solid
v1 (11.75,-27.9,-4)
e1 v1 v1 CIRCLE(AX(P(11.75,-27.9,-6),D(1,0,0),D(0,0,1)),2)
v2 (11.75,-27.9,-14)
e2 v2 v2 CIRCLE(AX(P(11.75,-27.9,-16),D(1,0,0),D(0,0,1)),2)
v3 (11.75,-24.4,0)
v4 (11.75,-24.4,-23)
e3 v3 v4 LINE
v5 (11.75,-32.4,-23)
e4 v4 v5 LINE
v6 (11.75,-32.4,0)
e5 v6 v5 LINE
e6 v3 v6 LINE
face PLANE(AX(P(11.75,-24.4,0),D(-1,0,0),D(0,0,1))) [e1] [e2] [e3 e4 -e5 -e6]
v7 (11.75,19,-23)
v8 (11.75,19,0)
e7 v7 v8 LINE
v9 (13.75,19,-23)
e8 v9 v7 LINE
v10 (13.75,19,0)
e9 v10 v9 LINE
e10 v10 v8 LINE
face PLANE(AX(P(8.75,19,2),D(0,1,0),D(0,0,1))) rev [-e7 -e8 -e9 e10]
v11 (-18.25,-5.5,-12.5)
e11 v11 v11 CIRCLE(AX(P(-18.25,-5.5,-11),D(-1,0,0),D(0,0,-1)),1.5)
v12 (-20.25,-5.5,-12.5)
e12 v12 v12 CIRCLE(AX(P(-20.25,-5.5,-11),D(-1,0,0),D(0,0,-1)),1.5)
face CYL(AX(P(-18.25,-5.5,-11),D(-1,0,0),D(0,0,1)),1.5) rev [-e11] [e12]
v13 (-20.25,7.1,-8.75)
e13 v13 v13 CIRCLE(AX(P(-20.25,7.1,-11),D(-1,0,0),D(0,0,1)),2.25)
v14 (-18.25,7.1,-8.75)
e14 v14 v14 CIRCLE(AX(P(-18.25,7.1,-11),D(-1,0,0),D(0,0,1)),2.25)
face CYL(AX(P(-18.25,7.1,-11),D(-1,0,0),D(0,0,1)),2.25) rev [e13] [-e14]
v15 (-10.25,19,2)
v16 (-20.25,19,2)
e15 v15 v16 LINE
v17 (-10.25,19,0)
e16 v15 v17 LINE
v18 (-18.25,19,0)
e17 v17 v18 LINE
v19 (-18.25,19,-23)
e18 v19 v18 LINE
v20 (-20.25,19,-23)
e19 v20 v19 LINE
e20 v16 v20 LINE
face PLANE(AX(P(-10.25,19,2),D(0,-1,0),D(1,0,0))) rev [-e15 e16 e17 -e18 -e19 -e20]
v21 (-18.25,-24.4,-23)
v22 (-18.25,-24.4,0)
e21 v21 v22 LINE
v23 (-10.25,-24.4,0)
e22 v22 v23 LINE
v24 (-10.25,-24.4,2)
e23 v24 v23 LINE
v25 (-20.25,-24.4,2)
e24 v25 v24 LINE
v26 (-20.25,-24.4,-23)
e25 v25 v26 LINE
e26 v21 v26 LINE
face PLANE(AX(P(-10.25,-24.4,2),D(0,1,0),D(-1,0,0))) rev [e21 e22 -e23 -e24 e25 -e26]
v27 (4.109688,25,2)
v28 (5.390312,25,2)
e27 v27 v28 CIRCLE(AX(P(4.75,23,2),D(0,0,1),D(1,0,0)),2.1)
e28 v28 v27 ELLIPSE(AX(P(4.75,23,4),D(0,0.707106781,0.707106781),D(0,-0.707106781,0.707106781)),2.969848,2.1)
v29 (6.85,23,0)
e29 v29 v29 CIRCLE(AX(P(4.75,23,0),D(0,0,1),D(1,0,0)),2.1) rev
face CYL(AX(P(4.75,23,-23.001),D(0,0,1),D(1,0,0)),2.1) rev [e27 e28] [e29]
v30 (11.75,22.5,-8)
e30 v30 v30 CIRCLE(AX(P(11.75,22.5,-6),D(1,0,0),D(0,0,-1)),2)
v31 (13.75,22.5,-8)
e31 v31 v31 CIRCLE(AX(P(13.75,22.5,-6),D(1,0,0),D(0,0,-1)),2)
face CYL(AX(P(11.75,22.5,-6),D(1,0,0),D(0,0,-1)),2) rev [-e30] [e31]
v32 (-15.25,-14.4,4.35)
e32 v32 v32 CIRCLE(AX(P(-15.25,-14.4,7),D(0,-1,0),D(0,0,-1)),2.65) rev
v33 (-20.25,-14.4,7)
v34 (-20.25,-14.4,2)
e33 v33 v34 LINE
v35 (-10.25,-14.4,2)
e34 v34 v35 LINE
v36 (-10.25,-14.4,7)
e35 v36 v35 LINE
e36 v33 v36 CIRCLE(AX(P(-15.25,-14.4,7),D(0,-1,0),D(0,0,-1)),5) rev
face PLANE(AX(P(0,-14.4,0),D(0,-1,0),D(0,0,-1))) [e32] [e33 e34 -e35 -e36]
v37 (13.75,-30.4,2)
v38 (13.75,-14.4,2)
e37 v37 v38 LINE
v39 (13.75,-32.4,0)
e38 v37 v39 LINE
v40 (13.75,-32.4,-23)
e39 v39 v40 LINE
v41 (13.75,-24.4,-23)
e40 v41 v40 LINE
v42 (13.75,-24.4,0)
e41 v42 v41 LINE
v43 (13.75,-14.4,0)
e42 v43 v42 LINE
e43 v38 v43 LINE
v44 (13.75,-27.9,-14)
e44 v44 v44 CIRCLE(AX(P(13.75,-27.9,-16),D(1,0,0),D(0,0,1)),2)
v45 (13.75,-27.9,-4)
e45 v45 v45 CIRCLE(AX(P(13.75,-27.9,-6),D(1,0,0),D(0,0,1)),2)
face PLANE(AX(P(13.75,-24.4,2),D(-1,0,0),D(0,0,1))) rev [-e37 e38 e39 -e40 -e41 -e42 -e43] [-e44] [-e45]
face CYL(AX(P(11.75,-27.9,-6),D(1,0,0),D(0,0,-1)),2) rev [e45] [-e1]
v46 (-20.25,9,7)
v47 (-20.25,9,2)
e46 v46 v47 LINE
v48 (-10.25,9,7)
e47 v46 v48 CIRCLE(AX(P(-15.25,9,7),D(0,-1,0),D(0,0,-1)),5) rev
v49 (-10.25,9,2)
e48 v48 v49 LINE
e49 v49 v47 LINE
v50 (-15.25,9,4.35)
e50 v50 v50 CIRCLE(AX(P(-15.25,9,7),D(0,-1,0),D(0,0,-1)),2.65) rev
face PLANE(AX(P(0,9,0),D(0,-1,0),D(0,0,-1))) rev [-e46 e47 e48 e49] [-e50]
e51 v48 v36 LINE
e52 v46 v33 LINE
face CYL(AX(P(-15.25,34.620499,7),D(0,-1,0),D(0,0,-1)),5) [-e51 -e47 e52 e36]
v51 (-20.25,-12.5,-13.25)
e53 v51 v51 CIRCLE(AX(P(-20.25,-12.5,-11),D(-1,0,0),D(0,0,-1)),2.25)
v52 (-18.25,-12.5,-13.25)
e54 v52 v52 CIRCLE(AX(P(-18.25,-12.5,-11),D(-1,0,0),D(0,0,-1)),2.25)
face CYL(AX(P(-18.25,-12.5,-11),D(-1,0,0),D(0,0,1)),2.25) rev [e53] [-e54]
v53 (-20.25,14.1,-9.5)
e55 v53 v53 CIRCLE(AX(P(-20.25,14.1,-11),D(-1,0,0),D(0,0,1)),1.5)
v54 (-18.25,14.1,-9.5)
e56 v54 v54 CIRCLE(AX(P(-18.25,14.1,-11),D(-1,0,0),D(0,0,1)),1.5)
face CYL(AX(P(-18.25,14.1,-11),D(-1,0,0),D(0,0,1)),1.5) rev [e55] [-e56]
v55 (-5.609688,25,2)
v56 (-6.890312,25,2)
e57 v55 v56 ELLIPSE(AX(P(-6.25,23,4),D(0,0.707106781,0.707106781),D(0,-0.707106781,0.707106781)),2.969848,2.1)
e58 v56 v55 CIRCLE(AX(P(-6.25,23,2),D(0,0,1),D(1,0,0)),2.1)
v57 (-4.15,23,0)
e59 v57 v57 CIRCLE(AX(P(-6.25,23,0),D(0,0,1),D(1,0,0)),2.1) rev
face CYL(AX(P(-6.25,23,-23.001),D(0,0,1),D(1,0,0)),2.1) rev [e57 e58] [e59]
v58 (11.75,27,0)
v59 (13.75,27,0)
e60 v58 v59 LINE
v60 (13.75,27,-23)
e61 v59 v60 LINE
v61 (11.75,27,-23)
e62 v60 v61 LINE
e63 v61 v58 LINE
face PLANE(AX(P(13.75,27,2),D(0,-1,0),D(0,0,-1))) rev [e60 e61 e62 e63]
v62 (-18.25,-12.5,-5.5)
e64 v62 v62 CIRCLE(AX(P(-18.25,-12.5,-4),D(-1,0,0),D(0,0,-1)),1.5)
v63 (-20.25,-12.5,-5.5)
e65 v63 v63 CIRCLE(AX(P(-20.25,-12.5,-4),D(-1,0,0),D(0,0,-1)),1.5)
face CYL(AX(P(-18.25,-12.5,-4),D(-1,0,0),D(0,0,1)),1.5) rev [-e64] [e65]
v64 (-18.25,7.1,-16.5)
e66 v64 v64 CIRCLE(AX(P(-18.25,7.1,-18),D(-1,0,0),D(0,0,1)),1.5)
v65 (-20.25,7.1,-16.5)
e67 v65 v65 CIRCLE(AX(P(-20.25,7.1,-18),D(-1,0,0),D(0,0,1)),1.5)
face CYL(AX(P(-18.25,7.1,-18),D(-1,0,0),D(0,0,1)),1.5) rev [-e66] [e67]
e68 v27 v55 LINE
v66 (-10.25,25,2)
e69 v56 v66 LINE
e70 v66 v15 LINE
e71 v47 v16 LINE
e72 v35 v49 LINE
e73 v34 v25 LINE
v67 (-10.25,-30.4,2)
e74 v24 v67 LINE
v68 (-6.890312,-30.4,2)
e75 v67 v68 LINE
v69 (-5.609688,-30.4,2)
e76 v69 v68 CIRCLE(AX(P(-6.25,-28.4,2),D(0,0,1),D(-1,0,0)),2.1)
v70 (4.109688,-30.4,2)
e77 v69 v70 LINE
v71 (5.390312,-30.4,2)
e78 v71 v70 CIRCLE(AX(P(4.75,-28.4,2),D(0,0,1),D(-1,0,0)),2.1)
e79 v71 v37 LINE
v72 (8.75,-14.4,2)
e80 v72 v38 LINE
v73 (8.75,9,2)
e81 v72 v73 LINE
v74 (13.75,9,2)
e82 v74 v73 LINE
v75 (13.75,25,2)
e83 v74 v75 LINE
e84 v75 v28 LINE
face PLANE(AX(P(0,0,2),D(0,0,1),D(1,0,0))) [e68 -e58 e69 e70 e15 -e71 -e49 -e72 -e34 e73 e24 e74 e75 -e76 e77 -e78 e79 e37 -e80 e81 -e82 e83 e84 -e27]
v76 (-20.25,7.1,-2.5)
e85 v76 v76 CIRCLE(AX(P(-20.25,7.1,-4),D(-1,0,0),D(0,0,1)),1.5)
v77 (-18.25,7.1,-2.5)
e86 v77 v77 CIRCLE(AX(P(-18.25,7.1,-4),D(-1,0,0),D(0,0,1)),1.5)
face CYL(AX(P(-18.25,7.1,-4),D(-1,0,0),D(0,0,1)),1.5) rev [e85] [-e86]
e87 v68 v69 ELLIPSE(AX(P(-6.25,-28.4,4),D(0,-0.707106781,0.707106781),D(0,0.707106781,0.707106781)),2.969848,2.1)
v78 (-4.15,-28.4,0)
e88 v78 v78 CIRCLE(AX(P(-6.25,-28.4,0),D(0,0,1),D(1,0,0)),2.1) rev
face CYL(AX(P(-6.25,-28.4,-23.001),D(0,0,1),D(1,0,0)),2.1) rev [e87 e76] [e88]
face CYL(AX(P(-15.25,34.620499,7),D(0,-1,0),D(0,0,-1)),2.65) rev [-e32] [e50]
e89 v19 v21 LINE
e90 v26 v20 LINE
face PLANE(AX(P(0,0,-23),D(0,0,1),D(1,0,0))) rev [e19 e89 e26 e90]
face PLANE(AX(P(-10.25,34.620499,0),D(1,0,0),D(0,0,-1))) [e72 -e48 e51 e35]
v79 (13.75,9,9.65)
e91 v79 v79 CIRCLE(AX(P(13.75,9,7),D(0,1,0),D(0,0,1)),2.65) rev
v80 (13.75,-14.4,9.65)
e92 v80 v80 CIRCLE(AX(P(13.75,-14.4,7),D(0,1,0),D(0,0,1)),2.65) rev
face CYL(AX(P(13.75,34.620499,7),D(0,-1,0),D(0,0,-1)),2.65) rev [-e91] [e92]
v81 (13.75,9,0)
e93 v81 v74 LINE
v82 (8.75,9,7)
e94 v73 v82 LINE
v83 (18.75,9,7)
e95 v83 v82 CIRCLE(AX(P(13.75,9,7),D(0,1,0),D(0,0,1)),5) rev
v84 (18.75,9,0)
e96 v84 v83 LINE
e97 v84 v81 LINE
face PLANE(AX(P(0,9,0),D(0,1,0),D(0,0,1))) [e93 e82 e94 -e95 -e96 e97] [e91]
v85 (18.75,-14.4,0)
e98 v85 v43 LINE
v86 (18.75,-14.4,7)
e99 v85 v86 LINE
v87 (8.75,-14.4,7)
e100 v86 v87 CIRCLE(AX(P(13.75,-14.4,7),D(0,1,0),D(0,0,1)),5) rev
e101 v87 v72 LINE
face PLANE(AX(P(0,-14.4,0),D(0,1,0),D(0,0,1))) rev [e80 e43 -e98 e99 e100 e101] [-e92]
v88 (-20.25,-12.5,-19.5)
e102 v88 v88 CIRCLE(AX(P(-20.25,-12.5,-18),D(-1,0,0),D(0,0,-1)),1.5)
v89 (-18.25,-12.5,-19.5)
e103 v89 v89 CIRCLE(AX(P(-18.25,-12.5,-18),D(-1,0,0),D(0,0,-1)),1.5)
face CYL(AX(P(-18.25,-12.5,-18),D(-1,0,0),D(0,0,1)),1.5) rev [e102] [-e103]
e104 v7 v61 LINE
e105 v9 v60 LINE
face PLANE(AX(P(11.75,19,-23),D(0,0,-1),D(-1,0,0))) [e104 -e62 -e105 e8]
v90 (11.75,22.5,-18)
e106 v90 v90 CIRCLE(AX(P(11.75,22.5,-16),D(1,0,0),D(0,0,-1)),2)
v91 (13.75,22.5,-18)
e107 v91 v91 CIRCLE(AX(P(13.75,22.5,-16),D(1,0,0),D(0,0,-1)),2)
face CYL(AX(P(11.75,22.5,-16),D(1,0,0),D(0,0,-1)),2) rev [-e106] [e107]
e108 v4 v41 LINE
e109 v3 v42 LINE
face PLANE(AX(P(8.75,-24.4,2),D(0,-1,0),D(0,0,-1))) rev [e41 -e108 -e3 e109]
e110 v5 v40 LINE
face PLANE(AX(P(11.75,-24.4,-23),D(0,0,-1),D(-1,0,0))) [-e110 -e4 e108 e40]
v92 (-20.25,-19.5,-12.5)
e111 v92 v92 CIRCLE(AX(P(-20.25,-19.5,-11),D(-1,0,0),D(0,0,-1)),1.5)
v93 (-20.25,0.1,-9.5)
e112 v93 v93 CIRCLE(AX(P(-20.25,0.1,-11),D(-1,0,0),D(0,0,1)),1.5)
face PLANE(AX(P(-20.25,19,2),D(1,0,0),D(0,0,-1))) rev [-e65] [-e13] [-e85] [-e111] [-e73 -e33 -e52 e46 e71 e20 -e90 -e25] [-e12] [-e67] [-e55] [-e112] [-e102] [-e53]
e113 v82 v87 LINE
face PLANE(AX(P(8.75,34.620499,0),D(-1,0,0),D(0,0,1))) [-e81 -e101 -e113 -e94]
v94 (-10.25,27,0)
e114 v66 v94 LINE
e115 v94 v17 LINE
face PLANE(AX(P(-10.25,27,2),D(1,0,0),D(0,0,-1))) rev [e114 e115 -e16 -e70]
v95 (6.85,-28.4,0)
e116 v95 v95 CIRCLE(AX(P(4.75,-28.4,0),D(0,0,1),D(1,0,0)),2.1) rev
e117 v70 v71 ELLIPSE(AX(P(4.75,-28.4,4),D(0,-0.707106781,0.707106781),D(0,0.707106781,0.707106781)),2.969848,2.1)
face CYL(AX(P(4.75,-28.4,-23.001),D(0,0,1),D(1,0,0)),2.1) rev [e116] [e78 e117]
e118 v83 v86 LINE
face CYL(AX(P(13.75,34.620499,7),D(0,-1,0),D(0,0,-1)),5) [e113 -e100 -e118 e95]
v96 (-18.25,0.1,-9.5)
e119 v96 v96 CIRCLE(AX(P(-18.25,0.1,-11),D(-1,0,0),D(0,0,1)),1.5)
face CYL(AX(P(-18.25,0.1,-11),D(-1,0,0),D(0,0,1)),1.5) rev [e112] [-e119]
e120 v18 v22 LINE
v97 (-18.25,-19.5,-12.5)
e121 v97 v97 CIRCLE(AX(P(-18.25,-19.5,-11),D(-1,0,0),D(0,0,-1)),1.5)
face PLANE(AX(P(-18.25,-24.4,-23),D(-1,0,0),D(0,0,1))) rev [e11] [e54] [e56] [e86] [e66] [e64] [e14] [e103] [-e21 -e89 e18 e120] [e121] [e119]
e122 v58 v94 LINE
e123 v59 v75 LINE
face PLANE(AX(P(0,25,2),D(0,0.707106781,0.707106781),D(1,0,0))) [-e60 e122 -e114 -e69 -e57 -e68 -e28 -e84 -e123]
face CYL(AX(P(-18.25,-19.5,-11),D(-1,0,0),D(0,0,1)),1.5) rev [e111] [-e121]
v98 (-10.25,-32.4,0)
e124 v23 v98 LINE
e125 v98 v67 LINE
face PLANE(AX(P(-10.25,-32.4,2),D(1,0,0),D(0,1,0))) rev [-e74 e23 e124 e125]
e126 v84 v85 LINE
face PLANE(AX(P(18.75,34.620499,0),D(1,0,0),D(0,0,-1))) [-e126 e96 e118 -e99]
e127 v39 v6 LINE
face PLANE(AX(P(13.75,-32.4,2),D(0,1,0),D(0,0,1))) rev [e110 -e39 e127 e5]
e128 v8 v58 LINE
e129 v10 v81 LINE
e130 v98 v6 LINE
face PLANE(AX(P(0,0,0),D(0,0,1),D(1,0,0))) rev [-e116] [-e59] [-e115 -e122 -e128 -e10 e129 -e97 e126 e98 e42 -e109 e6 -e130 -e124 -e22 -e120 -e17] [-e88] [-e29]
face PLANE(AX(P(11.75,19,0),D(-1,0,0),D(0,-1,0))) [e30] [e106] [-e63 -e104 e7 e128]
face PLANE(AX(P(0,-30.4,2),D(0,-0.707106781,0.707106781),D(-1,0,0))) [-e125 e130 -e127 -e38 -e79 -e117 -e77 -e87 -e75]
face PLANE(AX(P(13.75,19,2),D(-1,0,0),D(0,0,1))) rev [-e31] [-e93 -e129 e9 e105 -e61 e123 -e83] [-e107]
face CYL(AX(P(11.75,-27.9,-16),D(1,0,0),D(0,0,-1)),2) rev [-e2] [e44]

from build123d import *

# Parameters (mm, degrees)
BOSS_EXTRU_1_DEPTH      = 2
ESQUISSE2_W             = 2
ESQUISSE2_H             = 43.4
BOSS_EXTRU_2_DEPTH      = 23
ESQUISSE3_W             = 2
ESQUISSE3_H             = 23
BOSS_EXTRU_3_DEPTH      = 8
ESQUISSE8_W             = 2
ESQUISSE8_H             = 23
BOSS_EXTRU_5_DEPTH      = 8
ESQUISSE9_R             = 2
ENL_V_MAT_EXTRU_3_DEPTH = 2
ESQUISSE10_R            = 1.5
ESQUISSE10_R_2          = 2.25
ENL_V_MAT_EXTRU_4_DEPTH = 2
ENL_V_MAT_EXTRU_5_REACH = 47.66
ESQUISSE11_R            = 2.1
ESQUISSE13_R            = 2.65
BOSS_EXTRU_6_DEPTH      = 43.4
ENL_V_MAT_EXTRU_6_DEPTH = 10
ENL_V_MAT_EXTRU_7_DEPTH = 10
CHANFREIN1_SIZE         = 2
CHANFREIN2_SIZE         = 2


with BuildPart() as part:
    # Esquisse1 → Boss.-Extru.1 (new body)
    with BuildSketch(Plane.XY):
        Polygon((8.75, 17), (8.75, 19), (13.75, 19), (13.75, 27), (-10.25, 27), (-10.25, 19), (-20.25, 19), (-20.25, -24.4), (-10.25, -24.4), (-10.25, -32.4), (13.75, -32.4), (13.75, -24.4), (8.75, -24.4), (8.75, -22.4), (16.25, -22.4), (16.25, 17), align=None)
    extrude(amount=BOSS_EXTRU_1_DEPTH)

    # Esquisse2 → Boss.-Extru.2 (add)
    with BuildSketch(Plane(origin=(0, 0, 0), x_dir=(-1, 0, 0), z_dir=(0, 0, -1))):
        with Locations((19.25, -2.7)):
            Rectangle(ESQUISSE2_W, ESQUISSE2_H)
    extrude(amount=BOSS_EXTRU_2_DEPTH)

    # Esquisse3 → Boss.-Extru.3 (add)
    with BuildSketch(Plane(origin=(0, 27, 0), x_dir=(1, 0, 0), z_dir=(0, 1, 0))):
        with Locations((12.75, 11.5)):
            Rectangle(ESQUISSE3_W, ESQUISSE3_H)
    extrude(amount=-BOSS_EXTRU_3_DEPTH)

    # Esquisse8 → Boss.-Extru.5 (add)
    with BuildSketch(Plane.XZ.offset(32.4)):
        with Locations((12.75, -11.5)):
            Rectangle(ESQUISSE8_W, ESQUISSE8_H)
    extrude(amount=-BOSS_EXTRU_5_DEPTH)

    # Esquisse9 → Enlèv. mat.-Extru.3 (cut)
    with BuildSketch(Plane(origin=(13.75, 0, 0), x_dir=(0, 0, -1), z_dir=(1, 0, 0))):
        with Locations((6, 22.5)):
            Circle(ESQUISSE9_R)
        with Locations((16, 22.5)):
            Circle(ESQUISSE9_R)
        with Locations(Location((16, -27.9, 0), (0, 0, 180))):
            Circle(ESQUISSE9_R)
        with Locations(Location((6, -27.9, 0), (0, 0, 180))):
            Circle(ESQUISSE9_R)
    extrude(amount=-ENL_V_MAT_EXTRU_3_DEPTH, mode=Mode.SUBTRACT)

    # Esquisse10 → Enlèv. mat.-Extru.4 (cut)
    with BuildSketch(Plane.ZY.offset(20.25)):
        with Locations((-11, 14.1)):
            Circle(ESQUISSE10_R)
        with Locations((-11, 7.1)):
            Circle(ESQUISSE10_R_2)
        with Locations((-4, 7.1)):
            Circle(ESQUISSE10_R)
        with Locations((-11, 0.1)):
            Circle(ESQUISSE10_R)
        with Locations((-18, 7.1)):
            Circle(ESQUISSE10_R)
        with Locations(Location((-11, -5.5, 0), (0, 0, 180))):
            Circle(ESQUISSE10_R)
        with Locations(Location((-11, -12.5, 0), (0, 0, 180))):
            Circle(ESQUISSE10_R_2)
        with Locations(Location((-4, -12.5, 0), (0, 0, 180))):
            Circle(ESQUISSE10_R)
        with Locations(Location((-18, -12.5, 0), (0, 0, 180))):
            Circle(ESQUISSE10_R)
        with Locations(Location((-11, -19.5, 0), (0, 0, 180))):
            Circle(ESQUISSE10_R)
    extrude(amount=-ENL_V_MAT_EXTRU_4_DEPTH, mode=Mode.SUBTRACT)

    # Esquisse11 → Enlèv. mat.-Extru.5 (cut, up to next)
    with BuildSketch(Plane.XY.offset(2), mode=Mode.PRIVATE) as enl_v_mat_extru_5_sk1:
        with Locations((-6.25, 23)):
            Circle(ESQUISSE11_R)
    enl_v_mat_extru_5_tool1 = extrude(enl_v_mat_extru_5_sk1.sketch, amount=-ENL_V_MAT_EXTRU_5_REACH, mode=Mode.PRIVATE) & part.part
    # Esquisse11 → Enlèv. mat.-Extru.5 (cut, up to next)
    with BuildSketch(Plane.XY.offset(2), mode=Mode.PRIVATE) as enl_v_mat_extru_5_sk2:
        with Locations((4.75, 23)):
            Circle(ESQUISSE11_R)
    enl_v_mat_extru_5_tool2 = extrude(enl_v_mat_extru_5_sk2.sketch, amount=-ENL_V_MAT_EXTRU_5_REACH, mode=Mode.PRIVATE) & part.part
    # Esquisse11 → Enlèv. mat.-Extru.5 (cut, up to next)
    with BuildSketch(Plane.XY.offset(2), mode=Mode.PRIVATE) as enl_v_mat_extru_5_sk3:
        with Locations((4.75, -28.4)):
            Circle(ESQUISSE11_R)
    enl_v_mat_extru_5_tool3 = extrude(enl_v_mat_extru_5_sk3.sketch, amount=-ENL_V_MAT_EXTRU_5_REACH, mode=Mode.PRIVATE) & part.part
    # Esquisse11 → Enlèv. mat.-Extru.5 (cut, up to next)
    with BuildSketch(Plane.XY.offset(2), mode=Mode.PRIVATE) as enl_v_mat_extru_5_sk4:
        with Locations((-6.25, -28.4)):
            Circle(ESQUISSE11_R)
    enl_v_mat_extru_5_tool4 = extrude(enl_v_mat_extru_5_sk4.sketch, amount=-ENL_V_MAT_EXTRU_5_REACH, mode=Mode.PRIVATE) & part.part
    add(enl_v_mat_extru_5_tool1.solids().sort_by_distance((-6.25, 23, 2))[0], mode=Mode.SUBTRACT)
    add(enl_v_mat_extru_5_tool2.solids().sort_by_distance((4.75, 23, 2))[0], mode=Mode.SUBTRACT)
    add(enl_v_mat_extru_5_tool3.solids().sort_by_distance((4.75, -28.4, 2))[0], mode=Mode.SUBTRACT)
    add(enl_v_mat_extru_5_tool4.solids().sort_by_distance((-6.25, -28.4, 2))[0], mode=Mode.SUBTRACT)

    # Esquisse13 → Boss.-Extru.6 (add)
    # profile 1 of 2: a face of its own
    with BuildSketch(Plane.XZ.offset(24.4)):
        with BuildLine():
            Line((-10.25, 0), (-20.25, 0))
            Line((-20.25, 0), (-20.25, 7))
            ThreePointArc((-20.25, 7), (-15.25, 12), (-10.25, 7))
            Line((-10.25, 7), (-10.25, 0))
        make_face()
        with Locations(Location((-15.25, 7, 0), (0, 0, 270))):
            Circle(ESQUISSE13_R, mode=Mode.SUBTRACT)
    # profile 2 of 2: a face of its own
    with BuildSketch(Plane.XZ.offset(24.4)):
        with BuildLine():
            Line((8.75, 0), (18.75, 0))
            Line((18.75, 0), (18.75, 7))
            ThreePointArc((18.75, 7), (13.75, 12), (8.75, 7))
            Line((8.75, 7), (8.75, 0))
        make_face()
        with Locations(Location((13.75, 7, 0), (0, 0, 270))):
            Circle(ESQUISSE13_R, mode=Mode.SUBTRACT)
    extrude(amount=-BOSS_EXTRU_6_DEPTH)

    # Esquisse14 → Enlèv. mat.-Extru.6 (cut)
    with BuildSketch(Plane(origin=(0, 19, 0), x_dir=(1, 0, 0), z_dir=(0, 1, 0))):
        Polygon((-10.25, -2), (-20.25, -2), (-20.25, 7.294749089), (-22.778908198, 7.294749089), (-22.778908198, -2), (-24.693194377, -2), (-24.693194377, -14.280851393), (-10.25, -14.280851393), align=None)
        Polygon((8.75, -2), (13.75, -2), (13.75, 5.181058099), (21.169912006, 5.181058099), (21.169912006, -2), (27.112175355, -2), (27.112175355, -13.044541568), (8.75, -13.044541568), align=None)
    extrude(amount=-ENL_V_MAT_EXTRU_6_DEPTH, mode=Mode.SUBTRACT)

    # Esquisse15 → Enlèv. mat.-Extru.7 (cut)
    with BuildSketch(Plane.XZ.offset(24.4)):
        Polygon((-7.765139989, 2), (-20.25, 2), (-20.25, -7.221906492), (-27.573956422, -7.221906492), (-27.573956422, 2), (-33.179445784, 2), (-33.179445784, 15.314448699), (-7.765139989, 15.314448699), align=None)
        Polygon((6.630968462, 2), (13.75, 2), (13.75, -6.0207302), (22.303459128, -6.0207302), (22.303459128, 2), (24.534215098, 2), (24.534215098, 15.314448699), (6.630968462, 15.314448699), align=None)
    extrude(amount=-ENL_V_MAT_EXTRU_7_DEPTH, mode=Mode.SUBTRACT)

    # Chanfrein1
    # the kernel refuses this chamfer: 2 mm, written as the material it takes off along each edge
    with BuildSketch(Plane(origin=(18.893365976, 27, 2), x_dir=(0, -0.9996219169112968, 0.027495876610586296), z_dir=(-1, 0, 0))) as chanfrein1_piece_1:
        Polygon((CHANFREIN1_SIZE * 0.999621916911, -CHANFREIN1_SIZE * 0.0274958766106), (-CHANFREIN1_SIZE * 0.0274958766106, -CHANFREIN1_SIZE * 0.999621916911), (0, 0), align=None)
    extrude(amount=34.286731952, mode=Mode.SUBTRACT)

    # Chanfrein2
    # the kernel refuses this chamfer: 2 mm, written as the material it takes off along each edge
    with BuildSketch(Plane(origin=(-15.393365976, -32.4, 2), x_dir=(0, -0.02749587661058563, -0.9996219169112968), z_dir=(1, 0, 0))) as chanfrein2_piece_1:
        Polygon((CHANFREIN2_SIZE * 0.999621916911, CHANFREIN2_SIZE * 0.0274958766106), (-CHANFREIN2_SIZE * 0.0274958766106, CHANFREIN2_SIZE * 0.999621916911), (0, 0), align=None)
    extrude(amount=34.286731952, mode=Mode.SUBTRACT)


solid = part.part
